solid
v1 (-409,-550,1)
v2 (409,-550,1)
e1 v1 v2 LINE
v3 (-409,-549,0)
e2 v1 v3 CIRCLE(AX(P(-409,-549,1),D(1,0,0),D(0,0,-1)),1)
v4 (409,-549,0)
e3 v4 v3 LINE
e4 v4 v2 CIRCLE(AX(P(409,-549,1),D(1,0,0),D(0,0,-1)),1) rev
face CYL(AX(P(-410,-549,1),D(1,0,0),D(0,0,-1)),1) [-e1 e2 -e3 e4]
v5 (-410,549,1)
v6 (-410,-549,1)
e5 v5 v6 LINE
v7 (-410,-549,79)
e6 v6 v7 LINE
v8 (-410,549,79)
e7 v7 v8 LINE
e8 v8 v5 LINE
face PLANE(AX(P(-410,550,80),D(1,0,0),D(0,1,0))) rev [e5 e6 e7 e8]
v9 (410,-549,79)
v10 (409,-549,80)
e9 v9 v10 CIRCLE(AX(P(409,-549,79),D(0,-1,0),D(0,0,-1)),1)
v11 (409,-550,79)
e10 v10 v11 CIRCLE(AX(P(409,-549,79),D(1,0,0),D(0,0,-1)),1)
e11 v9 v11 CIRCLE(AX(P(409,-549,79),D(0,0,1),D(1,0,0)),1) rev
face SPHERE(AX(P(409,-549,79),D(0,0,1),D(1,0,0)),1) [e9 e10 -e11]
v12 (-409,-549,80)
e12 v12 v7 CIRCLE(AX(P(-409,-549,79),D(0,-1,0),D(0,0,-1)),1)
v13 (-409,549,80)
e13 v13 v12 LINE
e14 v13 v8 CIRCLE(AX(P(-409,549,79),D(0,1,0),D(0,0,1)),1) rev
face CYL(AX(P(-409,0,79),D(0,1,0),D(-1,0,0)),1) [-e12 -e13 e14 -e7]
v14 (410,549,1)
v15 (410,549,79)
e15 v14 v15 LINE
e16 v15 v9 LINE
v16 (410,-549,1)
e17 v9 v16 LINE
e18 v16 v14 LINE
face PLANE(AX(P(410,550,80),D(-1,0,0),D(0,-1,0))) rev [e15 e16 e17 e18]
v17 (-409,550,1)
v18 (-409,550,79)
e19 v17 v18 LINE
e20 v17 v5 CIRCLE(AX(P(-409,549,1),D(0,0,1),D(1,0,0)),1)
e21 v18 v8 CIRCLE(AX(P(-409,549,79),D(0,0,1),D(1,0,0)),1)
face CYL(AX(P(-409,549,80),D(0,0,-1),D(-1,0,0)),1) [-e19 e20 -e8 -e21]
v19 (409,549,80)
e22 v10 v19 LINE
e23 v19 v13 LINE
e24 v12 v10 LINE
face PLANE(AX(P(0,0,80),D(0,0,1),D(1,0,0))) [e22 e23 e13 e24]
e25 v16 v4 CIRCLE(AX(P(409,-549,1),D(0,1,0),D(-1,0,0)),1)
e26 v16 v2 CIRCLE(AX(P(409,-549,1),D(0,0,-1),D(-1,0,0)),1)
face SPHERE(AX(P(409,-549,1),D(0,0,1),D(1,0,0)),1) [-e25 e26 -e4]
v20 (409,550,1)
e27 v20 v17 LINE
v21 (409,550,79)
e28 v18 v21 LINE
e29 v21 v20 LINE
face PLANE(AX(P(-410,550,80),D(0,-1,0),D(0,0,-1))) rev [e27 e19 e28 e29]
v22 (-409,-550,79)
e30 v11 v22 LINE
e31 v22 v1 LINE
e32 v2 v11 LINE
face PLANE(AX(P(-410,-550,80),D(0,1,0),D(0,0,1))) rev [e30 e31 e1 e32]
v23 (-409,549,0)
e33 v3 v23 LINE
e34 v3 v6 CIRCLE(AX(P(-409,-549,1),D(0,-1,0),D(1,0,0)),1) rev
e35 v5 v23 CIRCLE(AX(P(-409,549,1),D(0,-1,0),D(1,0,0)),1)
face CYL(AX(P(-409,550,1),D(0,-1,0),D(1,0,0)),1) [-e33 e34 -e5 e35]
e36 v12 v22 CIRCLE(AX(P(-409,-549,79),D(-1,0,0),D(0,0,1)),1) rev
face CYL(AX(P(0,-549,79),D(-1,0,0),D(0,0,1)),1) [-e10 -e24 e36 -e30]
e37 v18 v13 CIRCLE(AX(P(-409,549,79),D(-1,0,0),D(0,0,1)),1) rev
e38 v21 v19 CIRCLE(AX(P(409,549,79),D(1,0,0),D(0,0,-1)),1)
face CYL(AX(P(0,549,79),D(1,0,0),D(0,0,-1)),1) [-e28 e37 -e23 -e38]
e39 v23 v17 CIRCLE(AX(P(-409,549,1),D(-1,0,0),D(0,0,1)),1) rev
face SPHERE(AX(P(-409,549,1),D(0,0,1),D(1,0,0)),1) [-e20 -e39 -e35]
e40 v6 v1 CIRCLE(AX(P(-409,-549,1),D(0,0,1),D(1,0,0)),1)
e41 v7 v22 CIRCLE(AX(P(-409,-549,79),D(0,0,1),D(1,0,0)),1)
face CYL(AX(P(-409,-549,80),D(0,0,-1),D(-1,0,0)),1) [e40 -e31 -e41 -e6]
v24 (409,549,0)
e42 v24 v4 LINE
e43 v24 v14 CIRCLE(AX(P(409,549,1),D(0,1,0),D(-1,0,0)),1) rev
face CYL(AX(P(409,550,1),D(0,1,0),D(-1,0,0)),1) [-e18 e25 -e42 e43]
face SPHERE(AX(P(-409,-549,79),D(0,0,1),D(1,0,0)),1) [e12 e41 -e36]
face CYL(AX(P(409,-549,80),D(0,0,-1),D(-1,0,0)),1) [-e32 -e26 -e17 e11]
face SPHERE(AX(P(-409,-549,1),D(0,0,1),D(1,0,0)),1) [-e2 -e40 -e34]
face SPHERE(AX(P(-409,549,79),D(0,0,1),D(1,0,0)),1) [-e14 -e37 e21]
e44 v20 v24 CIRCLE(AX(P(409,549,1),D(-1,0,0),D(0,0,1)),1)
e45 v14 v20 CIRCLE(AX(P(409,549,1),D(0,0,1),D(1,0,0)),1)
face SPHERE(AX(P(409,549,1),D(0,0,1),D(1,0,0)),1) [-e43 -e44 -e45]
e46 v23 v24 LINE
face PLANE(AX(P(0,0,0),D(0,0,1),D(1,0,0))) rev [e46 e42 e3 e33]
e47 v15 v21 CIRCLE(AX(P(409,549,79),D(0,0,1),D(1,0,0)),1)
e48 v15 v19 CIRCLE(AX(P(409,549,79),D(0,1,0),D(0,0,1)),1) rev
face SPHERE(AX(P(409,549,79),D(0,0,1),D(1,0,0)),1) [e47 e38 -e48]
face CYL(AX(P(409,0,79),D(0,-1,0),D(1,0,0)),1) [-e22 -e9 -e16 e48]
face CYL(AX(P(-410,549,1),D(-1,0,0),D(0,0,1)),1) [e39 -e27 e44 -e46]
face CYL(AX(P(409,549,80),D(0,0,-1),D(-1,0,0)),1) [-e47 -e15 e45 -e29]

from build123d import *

# Parameters (mm, degrees)
SKETCH_1_W      = 820
SKETCH_1_H      = 1100
EXTRUDE_1_DEPTH = 80
FILLET_1_R      = 1
FILLET_2_R      = 1


with BuildPart() as part:
    # Эскиз1 → Бобышка-Вытянуть1 (new body)
    with BuildSketch(Plane.XY):
        Rectangle(SKETCH_1_W, SKETCH_1_H)
    extrude(amount=EXTRUDE_1_DEPTH)

    # Скругление1
    fillet_1_edges = [part.edges().sort_by_distance(p)[0] for p in [
        (0, -550, 0),
        (-410, 0, 0),
        (0, 550, 0),
        (410, 0, 0),
    ]]
    fillet(fillet_1_edges, radius=FILLET_1_R)

    # Скругление2
    # the kernel refuses this fillet: 1 mm, written as the material it takes off along each edge
    with BuildSketch(Plane(origin=(409, -549, 1), x_dir=(0, -1, 0), z_dir=(1, 0, 0))) as fillet_2_piece_1_section:
        Polygon((0, 0), (FILLET_2_R, 0), (FILLET_2_R, FILLET_2_R), (0, FILLET_2_R), align=None)
    fillet_2_piece_1 = extrude(amount=FILLET_2_R, mode=Mode.PRIVATE)
    fillet_2_piece_1 = fillet_2_piece_1 - Plane(origin=(409, -549, 1), x_dir=(0, 0.7071067811865475, 0.7071067811865475), z_dir=(1, 0, 0)) * Sphere(FILLET_2_R, mode=Mode.PRIVATE)
    add(fillet_2_piece_1, mode=Mode.SUBTRACT)
    with BuildSketch(Plane(origin=(-409, -549, 1), x_dir=(0, -1, 0), z_dir=(-1, 0, 0))) as fillet_2_piece_2_section:
        Polygon((0, 0), (FILLET_2_R, 0), (FILLET_2_R, -FILLET_2_R), (0, -FILLET_2_R), align=None)
    fillet_2_piece_2 = extrude(amount=FILLET_2_R, mode=Mode.PRIVATE)
    fillet_2_piece_2 = fillet_2_piece_2 - Plane(origin=(-409, -549, 1), x_dir=(0, 0.7071067811865475, 0.7071067811865475), z_dir=(-1, 0, 0)) * Sphere(FILLET_2_R, mode=Mode.PRIVATE)
    add(fillet_2_piece_2, mode=Mode.SUBTRACT)
    with BuildSketch(Plane(origin=(409, 549, 1), x_dir=(1, 0, 0), z_dir=(0, 1, 0))) as fillet_2_piece_3_section:
        Polygon((0, 0), (FILLET_2_R, 0), (FILLET_2_R, FILLET_2_R), (0, FILLET_2_R), align=None)
    fillet_2_piece_3 = extrude(amount=FILLET_2_R, mode=Mode.PRIVATE)
    fillet_2_piece_3 = fillet_2_piece_3 - Plane(origin=(409, 549, 1), x_dir=(-0.7071067811865475, 0, 0.7071067811865475), z_dir=(0, 1, 0)) * Sphere(FILLET_2_R, mode=Mode.PRIVATE)
    add(fillet_2_piece_3, mode=Mode.SUBTRACT)
    with BuildSketch(Plane(origin=(-409, 549, 1), x_dir=(-1, 0, 0), z_dir=(0, 1, 0))) as fillet_2_piece_4_section:
        Polygon((0, 0), (FILLET_2_R, 0), (FILLET_2_R, -FILLET_2_R), (0, -FILLET_2_R), align=None)
    fillet_2_piece_4 = extrude(amount=FILLET_2_R, mode=Mode.PRIVATE)
    fillet_2_piece_4 = fillet_2_piece_4 - Plane(origin=(-409, 549, 1), x_dir=(0.7071067811865475, 0, 0.7071067811865475), z_dir=(0, 1, 0)) * Sphere(FILLET_2_R, mode=Mode.PRIVATE)
    add(fillet_2_piece_4, mode=Mode.SUBTRACT)
    with BuildSketch(Plane(origin=(-409, -549, 79), x_dir=(0, 0, 1), z_dir=(-1, 0, 0))) as fillet_2_piece_5_section:
        Polygon((0, 0), (FILLET_2_R, 0), (FILLET_2_R, -FILLET_2_R), (0, -FILLET_2_R), align=None)
    fillet_2_piece_5 = extrude(amount=FILLET_2_R, mode=Mode.PRIVATE)
    fillet_2_piece_5 = fillet_2_piece_5 - Plane(origin=(-409, -549, 79), x_dir=(0, 0.7071067811865475, -0.7071067811865475), z_dir=(-1, 0, 0)) * Sphere(FILLET_2_R, mode=Mode.PRIVATE)
    add(fillet_2_piece_5, mode=Mode.SUBTRACT)
    with BuildSketch(Plane(origin=(-409, 549, 79), x_dir=(-1, 0, 0), z_dir=(0, 1, 0))) as fillet_2_piece_6_section:
        Polygon((0, 0), (FILLET_2_R, 0), (FILLET_2_R, FILLET_2_R), (0, FILLET_2_R), align=None)
    fillet_2_piece_6 = extrude(amount=FILLET_2_R, mode=Mode.PRIVATE)
    fillet_2_piece_6 = fillet_2_piece_6 - Plane(origin=(-409, 549, 79), x_dir=(0.7071067811865475, 0, -0.7071067811865475), z_dir=(0, 1, 0)) * Sphere(FILLET_2_R, mode=Mode.PRIVATE)
    add(fillet_2_piece_6, mode=Mode.SUBTRACT)
    with BuildSketch(Plane(origin=(409, -549, 79), x_dir=(1, 0, 0), z_dir=(0, 0, 1))) as fillet_2_piece_7_section:
        Polygon((0, 0), (FILLET_2_R, 0), (FILLET_2_R, -FILLET_2_R), (0, -FILLET_2_R), align=None)
    fillet_2_piece_7 = extrude(amount=FILLET_2_R, mode=Mode.PRIVATE)
    fillet_2_piece_7 = fillet_2_piece_7 - Plane(origin=(409, -549, 79), x_dir=(-0.7071067811865476, 0.7071067811865475, 0), z_dir=(0, 0, 1)) * Sphere(FILLET_2_R, mode=Mode.PRIVATE)
    add(fillet_2_piece_7, mode=Mode.SUBTRACT)
    with BuildSketch(Plane(origin=(409, 549, 79), x_dir=(0, 0, 1), z_dir=(0, 1, 0))) as fillet_2_piece_8_section:
        Polygon((0, 0), (FILLET_2_R, 0), (FILLET_2_R, FILLET_2_R), (0, FILLET_2_R), align=None)
    fillet_2_piece_8 = extrude(amount=FILLET_2_R, mode=Mode.PRIVATE)
    fillet_2_piece_8 = fillet_2_piece_8 - Plane(origin=(409, 549, 79), x_dir=(-0.7071067811865475, 0, -0.7071067811865475), z_dir=(0, 1, 0)) * Sphere(FILLET_2_R, mode=Mode.PRIVATE)
    add(fillet_2_piece_8, mode=Mode.SUBTRACT)
    with BuildSketch(Plane(origin=(-410, -549, 80), x_dir=(0, 0, -1), z_dir=(0, 1, 0))) as fillet_2_piece_9:
        with BuildLine():
            CenterArc((FILLET_2_R, -FILLET_2_R), FILLET_2_R, 90, 90)
            Line((0, -FILLET_2_R), (0, 0))
            Line((0, 0), (FILLET_2_R, 0))
        make_face()
    extrude(amount=1098, mode=Mode.SUBTRACT)
    with BuildSketch(Plane(origin=(409, -550, 80), x_dir=(0, 1, 0), z_dir=(-1, 0, 0))) as fillet_2_piece_10:
        with BuildLine():
            CenterArc((FILLET_2_R, FILLET_2_R), FILLET_2_R, 180, 90)
            Line((0, FILLET_2_R), (0, 0))
            Line((0, 0), (FILLET_2_R, 0))
        make_face()
    extrude(amount=818, mode=Mode.SUBTRACT)
    with BuildSketch(Plane(origin=(410, 549, 80), x_dir=(-1, 0, 0), z_dir=(0, -1, 0))) as fillet_2_piece_11:
        with BuildLine():
            CenterArc((FILLET_2_R, FILLET_2_R), FILLET_2_R, 180, 90)
            Line((0, FILLET_2_R), (0, 0))
            Line((0, 0), (FILLET_2_R, 0))
        make_face()
    extrude(amount=1098, mode=Mode.SUBTRACT)
    with BuildSketch(Plane(origin=(-409, 550, 80), x_dir=(0, 0, -1), z_dir=(1, 0, 0))) as fillet_2_piece_12:
        with BuildLine():
            CenterArc((FILLET_2_R, -FILLET_2_R), FILLET_2_R, 90, 90)
            Line((0, -FILLET_2_R), (0, 0))
            Line((0, 0), (FILLET_2_R, 0))
        make_face()
    extrude(amount=818, mode=Mode.SUBTRACT)
    with BuildSketch(Plane(origin=(410, -550, 1), x_dir=(0, 1, 0), z_dir=(0, 0, 1)), Plane(origin=(410, 550, 1), x_dir=(-1, 0, 0), z_dir=(0, 0, 1))) as fillet_2_piece_13:
        with BuildLine():
            CenterArc((FILLET_2_R, FILLET_2_R), FILLET_2_R, 180, 90)
            Line((0, FILLET_2_R), (0, 0))
            Line((0, 0), (FILLET_2_R, 0))
        make_face()
    extrude(amount=78, mode=Mode.SUBTRACT)
    with BuildSketch(Plane(origin=(-410, -550, 1), x_dir=(0, 1, 0), z_dir=(0, 0, 1)), Plane(origin=(-410, 550, 1), x_dir=(1, 0, 0), z_dir=(0, 0, 1))) as fillet_2_piece_14:
        with BuildLine():
            CenterArc((FILLET_2_R, -FILLET_2_R), FILLET_2_R, 90, 90)
            Line((0, -FILLET_2_R), (0, 0))
            Line((0, 0), (FILLET_2_R, 0))
        make_face()
    extrude(amount=78, mode=Mode.SUBTRACT)


solid = part.part
